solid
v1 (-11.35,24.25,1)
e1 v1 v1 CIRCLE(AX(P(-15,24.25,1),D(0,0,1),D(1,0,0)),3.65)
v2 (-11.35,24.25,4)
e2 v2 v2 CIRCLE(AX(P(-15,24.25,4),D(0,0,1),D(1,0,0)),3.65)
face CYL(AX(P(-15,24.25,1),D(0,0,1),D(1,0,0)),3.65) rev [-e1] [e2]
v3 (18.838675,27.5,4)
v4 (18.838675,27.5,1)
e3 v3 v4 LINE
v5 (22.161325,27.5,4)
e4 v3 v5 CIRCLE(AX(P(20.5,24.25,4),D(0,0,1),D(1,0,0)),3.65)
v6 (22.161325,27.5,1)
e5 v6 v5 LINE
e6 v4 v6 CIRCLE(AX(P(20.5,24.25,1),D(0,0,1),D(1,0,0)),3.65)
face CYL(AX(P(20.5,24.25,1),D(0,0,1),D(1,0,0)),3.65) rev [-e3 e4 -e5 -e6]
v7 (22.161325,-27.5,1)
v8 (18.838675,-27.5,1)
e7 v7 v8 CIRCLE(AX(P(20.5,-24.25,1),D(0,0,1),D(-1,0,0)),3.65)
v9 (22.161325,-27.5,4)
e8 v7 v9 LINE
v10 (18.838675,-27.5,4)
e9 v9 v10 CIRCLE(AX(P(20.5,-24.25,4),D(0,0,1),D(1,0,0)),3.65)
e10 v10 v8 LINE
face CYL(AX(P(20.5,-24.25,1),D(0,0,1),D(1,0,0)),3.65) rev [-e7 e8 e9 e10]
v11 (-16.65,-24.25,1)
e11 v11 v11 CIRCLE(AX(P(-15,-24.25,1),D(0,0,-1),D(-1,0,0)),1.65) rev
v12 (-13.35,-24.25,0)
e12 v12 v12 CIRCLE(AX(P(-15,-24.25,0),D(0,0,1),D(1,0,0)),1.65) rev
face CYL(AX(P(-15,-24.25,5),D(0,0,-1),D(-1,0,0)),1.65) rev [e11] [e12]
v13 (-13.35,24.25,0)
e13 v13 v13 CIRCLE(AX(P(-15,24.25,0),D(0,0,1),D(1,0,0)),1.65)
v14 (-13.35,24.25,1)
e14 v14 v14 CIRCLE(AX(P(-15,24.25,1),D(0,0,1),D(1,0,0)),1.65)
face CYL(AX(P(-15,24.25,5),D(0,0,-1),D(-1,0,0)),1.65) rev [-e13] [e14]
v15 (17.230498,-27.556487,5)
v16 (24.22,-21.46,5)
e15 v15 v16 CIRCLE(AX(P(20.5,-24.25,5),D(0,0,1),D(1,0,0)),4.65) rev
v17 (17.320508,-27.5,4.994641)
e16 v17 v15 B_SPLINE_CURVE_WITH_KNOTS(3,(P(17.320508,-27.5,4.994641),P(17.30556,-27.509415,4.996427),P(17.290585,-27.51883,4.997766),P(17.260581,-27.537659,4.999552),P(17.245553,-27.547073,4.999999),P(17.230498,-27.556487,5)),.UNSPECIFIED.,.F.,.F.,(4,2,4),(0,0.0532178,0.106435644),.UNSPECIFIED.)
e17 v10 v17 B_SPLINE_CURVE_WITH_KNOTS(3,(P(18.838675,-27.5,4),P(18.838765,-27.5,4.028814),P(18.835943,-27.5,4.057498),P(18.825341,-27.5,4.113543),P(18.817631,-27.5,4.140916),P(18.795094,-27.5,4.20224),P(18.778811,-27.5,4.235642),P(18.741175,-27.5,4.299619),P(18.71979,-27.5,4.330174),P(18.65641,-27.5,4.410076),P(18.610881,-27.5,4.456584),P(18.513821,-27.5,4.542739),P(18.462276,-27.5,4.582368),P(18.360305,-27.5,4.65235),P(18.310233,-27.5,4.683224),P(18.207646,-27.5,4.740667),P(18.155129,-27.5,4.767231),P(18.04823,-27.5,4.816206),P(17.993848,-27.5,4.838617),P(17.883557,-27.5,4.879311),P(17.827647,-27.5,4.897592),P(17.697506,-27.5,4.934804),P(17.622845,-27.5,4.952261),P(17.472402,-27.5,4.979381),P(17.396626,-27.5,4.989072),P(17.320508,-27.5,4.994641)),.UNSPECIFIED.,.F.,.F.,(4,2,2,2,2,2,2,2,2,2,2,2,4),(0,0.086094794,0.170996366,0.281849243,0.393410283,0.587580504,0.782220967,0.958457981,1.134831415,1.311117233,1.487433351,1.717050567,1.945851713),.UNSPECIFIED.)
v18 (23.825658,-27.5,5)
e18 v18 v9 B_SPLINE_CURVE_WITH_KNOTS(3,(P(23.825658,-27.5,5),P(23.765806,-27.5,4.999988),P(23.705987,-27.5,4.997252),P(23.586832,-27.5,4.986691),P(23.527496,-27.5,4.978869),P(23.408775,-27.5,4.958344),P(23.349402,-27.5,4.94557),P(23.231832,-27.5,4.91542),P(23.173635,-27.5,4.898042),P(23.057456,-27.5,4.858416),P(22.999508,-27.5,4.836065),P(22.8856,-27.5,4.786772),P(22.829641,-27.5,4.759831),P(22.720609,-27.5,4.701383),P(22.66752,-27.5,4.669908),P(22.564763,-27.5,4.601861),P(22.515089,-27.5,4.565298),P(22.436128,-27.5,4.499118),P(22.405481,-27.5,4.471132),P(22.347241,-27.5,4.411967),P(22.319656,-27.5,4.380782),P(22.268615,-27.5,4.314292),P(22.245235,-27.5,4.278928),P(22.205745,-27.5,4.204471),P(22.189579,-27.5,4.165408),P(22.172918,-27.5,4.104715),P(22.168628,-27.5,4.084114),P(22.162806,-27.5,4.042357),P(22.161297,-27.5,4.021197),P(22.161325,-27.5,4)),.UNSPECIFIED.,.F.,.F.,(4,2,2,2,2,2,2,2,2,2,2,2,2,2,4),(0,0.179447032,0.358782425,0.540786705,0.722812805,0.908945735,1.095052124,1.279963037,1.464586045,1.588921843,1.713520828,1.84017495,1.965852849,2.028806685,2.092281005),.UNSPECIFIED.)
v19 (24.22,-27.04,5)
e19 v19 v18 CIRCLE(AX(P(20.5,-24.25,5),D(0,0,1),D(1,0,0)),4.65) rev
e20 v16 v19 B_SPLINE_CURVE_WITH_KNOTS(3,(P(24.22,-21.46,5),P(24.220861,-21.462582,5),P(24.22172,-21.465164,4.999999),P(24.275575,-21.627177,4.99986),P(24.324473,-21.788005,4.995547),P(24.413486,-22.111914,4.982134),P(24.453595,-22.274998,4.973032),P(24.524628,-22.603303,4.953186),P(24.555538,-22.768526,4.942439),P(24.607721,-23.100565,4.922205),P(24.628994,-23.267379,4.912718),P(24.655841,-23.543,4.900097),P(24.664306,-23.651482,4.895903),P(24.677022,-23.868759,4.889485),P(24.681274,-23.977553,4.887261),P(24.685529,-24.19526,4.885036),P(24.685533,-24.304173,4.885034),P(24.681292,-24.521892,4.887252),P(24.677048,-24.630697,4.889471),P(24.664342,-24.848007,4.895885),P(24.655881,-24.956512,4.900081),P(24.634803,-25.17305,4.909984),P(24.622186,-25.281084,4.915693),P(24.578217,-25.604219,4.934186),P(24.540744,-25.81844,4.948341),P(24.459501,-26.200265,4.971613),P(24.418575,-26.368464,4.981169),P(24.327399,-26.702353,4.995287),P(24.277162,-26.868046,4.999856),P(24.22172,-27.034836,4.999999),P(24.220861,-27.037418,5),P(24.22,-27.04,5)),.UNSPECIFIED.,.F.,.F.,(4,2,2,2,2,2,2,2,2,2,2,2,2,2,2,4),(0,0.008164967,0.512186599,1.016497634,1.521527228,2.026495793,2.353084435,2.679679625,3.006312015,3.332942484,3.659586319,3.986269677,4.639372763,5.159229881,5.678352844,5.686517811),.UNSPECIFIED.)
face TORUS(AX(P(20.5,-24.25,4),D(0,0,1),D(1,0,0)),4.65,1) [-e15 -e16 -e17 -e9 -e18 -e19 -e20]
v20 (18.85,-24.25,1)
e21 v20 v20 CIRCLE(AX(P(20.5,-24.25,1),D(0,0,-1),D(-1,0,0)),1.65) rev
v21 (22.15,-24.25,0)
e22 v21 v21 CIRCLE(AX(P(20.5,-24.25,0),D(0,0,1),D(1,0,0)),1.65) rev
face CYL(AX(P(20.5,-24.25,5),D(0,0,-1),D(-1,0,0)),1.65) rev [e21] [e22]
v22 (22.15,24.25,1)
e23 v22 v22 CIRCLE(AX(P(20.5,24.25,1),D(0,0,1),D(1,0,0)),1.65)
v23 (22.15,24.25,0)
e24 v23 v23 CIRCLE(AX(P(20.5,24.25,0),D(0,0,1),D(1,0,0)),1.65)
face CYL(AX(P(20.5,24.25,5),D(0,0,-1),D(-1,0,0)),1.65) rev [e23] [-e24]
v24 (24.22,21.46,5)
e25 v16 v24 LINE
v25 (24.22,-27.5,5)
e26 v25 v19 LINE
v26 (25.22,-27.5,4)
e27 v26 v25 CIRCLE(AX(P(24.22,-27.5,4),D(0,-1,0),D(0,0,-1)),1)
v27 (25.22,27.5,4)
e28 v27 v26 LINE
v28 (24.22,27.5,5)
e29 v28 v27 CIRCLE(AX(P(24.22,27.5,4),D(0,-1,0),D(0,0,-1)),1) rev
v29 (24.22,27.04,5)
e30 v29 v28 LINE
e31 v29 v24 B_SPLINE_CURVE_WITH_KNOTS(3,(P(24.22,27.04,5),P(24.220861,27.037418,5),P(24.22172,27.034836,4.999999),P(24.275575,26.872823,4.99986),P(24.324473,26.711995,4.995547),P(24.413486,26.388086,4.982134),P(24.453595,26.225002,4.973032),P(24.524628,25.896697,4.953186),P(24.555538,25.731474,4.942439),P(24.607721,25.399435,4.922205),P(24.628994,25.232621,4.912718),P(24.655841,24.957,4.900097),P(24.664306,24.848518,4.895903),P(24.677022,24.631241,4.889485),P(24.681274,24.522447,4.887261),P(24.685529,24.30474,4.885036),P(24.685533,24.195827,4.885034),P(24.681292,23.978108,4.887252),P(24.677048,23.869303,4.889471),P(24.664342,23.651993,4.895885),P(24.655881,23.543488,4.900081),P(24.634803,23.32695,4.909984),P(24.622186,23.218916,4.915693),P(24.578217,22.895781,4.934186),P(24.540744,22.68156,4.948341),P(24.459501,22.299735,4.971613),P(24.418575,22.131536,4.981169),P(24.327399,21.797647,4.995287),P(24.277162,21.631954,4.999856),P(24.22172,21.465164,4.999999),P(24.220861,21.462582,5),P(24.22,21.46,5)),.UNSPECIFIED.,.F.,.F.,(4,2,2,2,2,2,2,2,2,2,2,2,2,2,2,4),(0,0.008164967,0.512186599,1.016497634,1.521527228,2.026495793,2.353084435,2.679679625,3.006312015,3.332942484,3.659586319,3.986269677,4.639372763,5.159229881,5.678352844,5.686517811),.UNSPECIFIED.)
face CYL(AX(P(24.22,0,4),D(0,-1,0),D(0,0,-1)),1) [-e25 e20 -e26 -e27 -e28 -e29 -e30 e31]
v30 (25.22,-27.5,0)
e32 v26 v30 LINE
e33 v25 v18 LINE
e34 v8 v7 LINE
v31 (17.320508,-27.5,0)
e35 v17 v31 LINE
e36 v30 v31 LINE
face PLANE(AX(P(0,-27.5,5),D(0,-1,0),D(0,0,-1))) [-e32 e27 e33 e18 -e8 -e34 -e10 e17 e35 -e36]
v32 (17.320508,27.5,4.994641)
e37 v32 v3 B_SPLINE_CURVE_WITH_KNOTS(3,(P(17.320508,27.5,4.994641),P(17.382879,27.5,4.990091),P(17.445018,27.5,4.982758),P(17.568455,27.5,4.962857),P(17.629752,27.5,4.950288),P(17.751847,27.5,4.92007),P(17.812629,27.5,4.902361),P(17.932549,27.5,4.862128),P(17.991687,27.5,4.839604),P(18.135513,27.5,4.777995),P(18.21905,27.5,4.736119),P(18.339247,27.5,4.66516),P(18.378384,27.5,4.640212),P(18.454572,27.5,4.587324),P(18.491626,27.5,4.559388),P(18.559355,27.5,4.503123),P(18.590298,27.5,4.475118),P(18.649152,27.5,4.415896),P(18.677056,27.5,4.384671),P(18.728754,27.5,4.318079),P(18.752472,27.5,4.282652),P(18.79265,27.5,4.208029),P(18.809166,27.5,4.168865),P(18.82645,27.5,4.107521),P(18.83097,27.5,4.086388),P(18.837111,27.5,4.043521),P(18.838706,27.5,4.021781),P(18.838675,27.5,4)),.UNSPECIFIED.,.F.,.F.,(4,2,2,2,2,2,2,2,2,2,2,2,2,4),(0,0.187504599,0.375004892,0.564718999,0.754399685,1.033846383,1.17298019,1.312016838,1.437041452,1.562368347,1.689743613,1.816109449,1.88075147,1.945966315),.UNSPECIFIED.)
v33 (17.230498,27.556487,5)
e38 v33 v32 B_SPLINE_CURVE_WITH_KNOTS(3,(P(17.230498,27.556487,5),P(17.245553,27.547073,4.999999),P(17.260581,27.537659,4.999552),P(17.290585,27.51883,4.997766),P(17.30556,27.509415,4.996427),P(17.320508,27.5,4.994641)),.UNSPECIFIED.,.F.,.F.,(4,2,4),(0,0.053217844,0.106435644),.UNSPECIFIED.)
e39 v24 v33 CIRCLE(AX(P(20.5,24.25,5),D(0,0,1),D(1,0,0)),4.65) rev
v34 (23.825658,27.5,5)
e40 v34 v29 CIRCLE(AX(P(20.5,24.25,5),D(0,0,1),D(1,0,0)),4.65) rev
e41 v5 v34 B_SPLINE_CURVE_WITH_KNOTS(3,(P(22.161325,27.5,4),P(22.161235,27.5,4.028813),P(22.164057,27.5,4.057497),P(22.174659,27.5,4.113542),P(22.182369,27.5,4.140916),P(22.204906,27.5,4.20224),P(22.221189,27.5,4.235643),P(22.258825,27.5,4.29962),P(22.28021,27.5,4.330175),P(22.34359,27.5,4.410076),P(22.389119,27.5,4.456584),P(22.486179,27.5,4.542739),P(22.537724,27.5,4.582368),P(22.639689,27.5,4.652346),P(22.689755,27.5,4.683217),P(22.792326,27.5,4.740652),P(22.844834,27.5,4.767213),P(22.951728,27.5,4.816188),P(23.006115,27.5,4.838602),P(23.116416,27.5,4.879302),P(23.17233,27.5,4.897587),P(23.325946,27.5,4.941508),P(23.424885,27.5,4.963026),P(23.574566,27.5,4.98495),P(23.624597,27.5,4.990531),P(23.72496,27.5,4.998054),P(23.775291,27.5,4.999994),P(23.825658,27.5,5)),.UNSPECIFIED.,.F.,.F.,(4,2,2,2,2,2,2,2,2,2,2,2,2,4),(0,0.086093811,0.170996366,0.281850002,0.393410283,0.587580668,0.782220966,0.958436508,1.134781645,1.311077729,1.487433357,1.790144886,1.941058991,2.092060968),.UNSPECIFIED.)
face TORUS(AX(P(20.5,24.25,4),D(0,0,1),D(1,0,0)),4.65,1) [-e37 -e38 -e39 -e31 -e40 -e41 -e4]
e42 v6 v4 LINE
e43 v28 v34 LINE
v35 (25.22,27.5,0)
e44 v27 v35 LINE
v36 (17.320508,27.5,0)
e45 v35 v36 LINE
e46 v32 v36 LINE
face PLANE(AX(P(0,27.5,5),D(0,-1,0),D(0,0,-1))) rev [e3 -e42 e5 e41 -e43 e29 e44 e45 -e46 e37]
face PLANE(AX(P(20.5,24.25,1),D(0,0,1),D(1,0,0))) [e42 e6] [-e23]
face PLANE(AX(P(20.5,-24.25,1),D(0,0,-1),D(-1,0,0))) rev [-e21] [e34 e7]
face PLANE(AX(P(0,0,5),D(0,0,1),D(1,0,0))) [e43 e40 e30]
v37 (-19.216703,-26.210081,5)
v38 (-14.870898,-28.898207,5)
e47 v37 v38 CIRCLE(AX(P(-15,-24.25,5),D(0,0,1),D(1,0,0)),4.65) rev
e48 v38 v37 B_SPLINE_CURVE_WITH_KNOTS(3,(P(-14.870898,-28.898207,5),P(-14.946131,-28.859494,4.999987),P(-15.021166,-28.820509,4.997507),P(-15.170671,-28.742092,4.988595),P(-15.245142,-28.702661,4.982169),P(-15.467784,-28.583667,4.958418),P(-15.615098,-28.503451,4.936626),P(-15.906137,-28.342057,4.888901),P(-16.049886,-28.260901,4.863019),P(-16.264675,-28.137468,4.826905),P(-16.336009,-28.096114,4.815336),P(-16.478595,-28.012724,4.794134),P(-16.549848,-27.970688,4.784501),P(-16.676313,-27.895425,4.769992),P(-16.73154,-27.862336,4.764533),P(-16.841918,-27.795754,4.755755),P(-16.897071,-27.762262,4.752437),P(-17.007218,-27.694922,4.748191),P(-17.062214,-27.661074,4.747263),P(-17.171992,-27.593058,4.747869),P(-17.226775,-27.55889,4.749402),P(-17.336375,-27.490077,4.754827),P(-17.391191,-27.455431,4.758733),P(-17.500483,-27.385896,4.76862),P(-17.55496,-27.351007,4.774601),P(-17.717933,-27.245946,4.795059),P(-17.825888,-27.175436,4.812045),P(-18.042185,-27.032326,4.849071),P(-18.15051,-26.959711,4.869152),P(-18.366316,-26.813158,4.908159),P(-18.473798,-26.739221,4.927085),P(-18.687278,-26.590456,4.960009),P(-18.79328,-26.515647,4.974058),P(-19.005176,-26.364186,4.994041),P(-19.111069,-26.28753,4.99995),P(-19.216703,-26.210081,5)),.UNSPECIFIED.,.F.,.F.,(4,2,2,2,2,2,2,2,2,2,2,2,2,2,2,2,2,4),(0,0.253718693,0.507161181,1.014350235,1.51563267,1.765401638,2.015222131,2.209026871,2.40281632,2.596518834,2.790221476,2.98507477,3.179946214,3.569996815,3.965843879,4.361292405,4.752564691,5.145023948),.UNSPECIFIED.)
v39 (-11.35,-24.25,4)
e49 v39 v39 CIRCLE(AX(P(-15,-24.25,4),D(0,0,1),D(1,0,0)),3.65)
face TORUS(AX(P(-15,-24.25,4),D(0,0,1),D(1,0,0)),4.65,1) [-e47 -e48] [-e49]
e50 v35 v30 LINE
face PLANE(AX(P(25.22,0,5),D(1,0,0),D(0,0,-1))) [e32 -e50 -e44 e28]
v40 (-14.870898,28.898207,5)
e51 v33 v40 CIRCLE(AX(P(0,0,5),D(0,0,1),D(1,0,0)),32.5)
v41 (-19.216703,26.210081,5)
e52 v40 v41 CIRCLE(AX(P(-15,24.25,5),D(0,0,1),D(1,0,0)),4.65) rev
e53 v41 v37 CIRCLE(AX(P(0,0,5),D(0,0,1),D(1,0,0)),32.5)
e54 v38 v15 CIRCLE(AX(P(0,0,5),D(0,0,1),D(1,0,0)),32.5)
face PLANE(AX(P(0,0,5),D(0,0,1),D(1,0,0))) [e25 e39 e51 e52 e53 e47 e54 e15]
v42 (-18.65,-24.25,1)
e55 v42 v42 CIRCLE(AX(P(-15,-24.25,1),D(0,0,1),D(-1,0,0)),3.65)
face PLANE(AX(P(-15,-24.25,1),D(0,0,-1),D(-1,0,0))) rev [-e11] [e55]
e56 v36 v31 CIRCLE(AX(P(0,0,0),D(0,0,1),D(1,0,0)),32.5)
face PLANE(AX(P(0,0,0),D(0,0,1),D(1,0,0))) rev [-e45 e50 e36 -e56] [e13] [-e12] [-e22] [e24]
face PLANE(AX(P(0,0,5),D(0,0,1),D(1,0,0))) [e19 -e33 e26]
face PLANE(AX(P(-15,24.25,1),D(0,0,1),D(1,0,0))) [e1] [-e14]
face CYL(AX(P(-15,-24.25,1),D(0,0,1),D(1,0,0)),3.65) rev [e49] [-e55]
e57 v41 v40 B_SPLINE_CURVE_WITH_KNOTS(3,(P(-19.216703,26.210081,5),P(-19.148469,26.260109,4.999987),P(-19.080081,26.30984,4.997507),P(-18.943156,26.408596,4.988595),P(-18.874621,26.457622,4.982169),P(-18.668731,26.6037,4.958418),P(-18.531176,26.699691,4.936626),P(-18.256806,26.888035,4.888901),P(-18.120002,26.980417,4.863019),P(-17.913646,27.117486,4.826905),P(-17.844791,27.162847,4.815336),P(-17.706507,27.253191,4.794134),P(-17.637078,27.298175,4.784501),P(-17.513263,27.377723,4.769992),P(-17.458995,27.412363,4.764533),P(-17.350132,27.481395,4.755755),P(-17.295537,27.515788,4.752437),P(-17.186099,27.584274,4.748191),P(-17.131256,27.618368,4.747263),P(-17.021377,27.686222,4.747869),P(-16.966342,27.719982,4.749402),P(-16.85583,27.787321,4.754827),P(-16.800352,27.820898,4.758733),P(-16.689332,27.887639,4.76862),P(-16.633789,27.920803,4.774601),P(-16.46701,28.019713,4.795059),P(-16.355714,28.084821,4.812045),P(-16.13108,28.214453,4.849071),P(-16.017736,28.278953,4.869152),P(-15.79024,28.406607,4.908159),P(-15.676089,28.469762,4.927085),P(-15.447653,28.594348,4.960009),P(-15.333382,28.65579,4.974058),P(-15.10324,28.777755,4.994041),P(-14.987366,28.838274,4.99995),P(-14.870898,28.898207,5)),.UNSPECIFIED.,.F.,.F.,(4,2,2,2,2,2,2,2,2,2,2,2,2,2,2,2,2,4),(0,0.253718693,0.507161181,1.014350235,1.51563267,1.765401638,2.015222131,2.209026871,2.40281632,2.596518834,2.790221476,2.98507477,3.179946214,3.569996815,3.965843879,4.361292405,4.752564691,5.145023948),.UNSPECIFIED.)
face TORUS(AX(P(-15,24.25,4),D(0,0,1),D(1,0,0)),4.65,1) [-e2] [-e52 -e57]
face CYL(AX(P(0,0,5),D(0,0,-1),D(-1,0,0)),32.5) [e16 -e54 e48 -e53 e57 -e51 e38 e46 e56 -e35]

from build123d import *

# Parameters (mm, degrees)
SKIZZE1_R                       = 1.65
AUFSATZ_LINEAR_AUSTRAGEN1_DEPTH = 5
SKIZZE2_R                       = 3.65
SCHNITT_LINEAR_AUSTRAGEN1_DEPTH = 4
VERRUNDUNG10_R                  = 1


with BuildPart() as part:
    # Skizze1 → Aufsatz-Linear austragen1 (new body)
    with BuildSketch(Plane.XY):
        with BuildLine():
            Line((25.22, 27.5), (17.320508076, 27.5))
            ThreePointArc((17.320508076, 27.5), (-32.5, 0), (17.320508076, -27.5))
            Line((17.320508076, -27.5), (25.22, -27.5))
            Line((25.22, -27.5), (25.22, 27.5))
        make_face()
        with Locations((20.5, -24.25)):
            Circle(SKIZZE1_R, mode=Mode.SUBTRACT)
        with Locations((20.5, 24.25)):
            Circle(SKIZZE1_R, mode=Mode.SUBTRACT)
        with Locations((-15, -24.25)):
            Circle(SKIZZE1_R, mode=Mode.SUBTRACT)
        with Locations((-15, 24.25)):
            Circle(SKIZZE1_R, mode=Mode.SUBTRACT)
    extrude(amount=AUFSATZ_LINEAR_AUSTRAGEN1_DEPTH)

    # Skizze2 → Schnitt-Linear austragen1 (cut)
    with BuildSketch(Plane.XY.offset(5)):
        with Locations((-15, 24.25)):
            Circle(SKIZZE2_R)
        with Locations((20.5, 24.25)):
            Circle(SKIZZE2_R)
        with Locations((20.5, -24.25)):
            Circle(SKIZZE2_R)
        with Locations(Location((-15, -24.25, 0), (0, 0, 180))):
            Circle(SKIZZE2_R)
    extrude(amount=-SCHNITT_LINEAR_AUSTRAGEN1_DEPTH, mode=Mode.SUBTRACT)

    # Verrundung10
    # the kernel refuses this fillet: 1 mm, written as the material it takes off along each edge
    with BuildSketch(Plane(origin=(25.22, -30, 5), x_dir=(-1, 0, 0), z_dir=(0, 1, 0))) as verrundung10_piece_1:
        with BuildLine():
            CenterArc((VERRUNDUNG10_R, -VERRUNDUNG10_R), VERRUNDUNG10_R, 90, 90)
            Line((0, -VERRUNDUNG10_R), (0, 0))
            Line((0, 0), (VERRUNDUNG10_R, 0))
        make_face()
    extrude(amount=60, mode=Mode.SUBTRACT)
    with BuildSketch(Plane(origin=(20.5, 24.25, 5), x_dir=(0.0031415874858533787, 0.9999950652018582, 0), z_dir=(-0.9999950652018582, 0.0031415874858533787, 0))) as verrundung10_piece_2:
        with BuildLine():
            CenterArc((3.65 + VERRUNDUNG10_R, VERRUNDUNG10_R), VERRUNDUNG10_R, 180, 90)
            Line((3.65 + VERRUNDUNG10_R, 0), (3.65, 0))
            Line((3.65, 0), (3.65, VERRUNDUNG10_R))
        make_face()
    revolve(axis=Axis((20.5, 24.25, 5), (0, 0, -1)), revolution_arc=359.64, mode=Mode.SUBTRACT)
    with BuildSketch(Plane(origin=(20.5, -24.25, 5), x_dir=(-0.0031415874859059387, -0.999995065201858, 0), z_dir=(0.999995065201858, -0.0031415874859059387, 0))) as verrundung10_piece_3:
        with BuildLine():
            CenterArc((3.65 + VERRUNDUNG10_R, VERRUNDUNG10_R), VERRUNDUNG10_R, 180, 90)
            Line((3.65 + VERRUNDUNG10_R, 0), (3.65, 0))
            Line((3.65, 0), (3.65, VERRUNDUNG10_R))
        make_face()
    revolve(axis=Axis((20.5, -24.25, 5), (0, 0, -1)), revolution_arc=359.64, mode=Mode.SUBTRACT)
    with BuildSketch(Plane(origin=(-15, -24.25, 5), x_dir=(-1, 0, 0), z_dir=(0, 1, 0))) as verrundung10_piece_4:
        with BuildLine():
            CenterArc((3.65 + VERRUNDUNG10_R, -VERRUNDUNG10_R), VERRUNDUNG10_R, 90, 90)
            Line((3.65, -VERRUNDUNG10_R), (3.65, 0))
            Line((3.65, 0), (3.65 + VERRUNDUNG10_R, 0))
        make_face()
    revolve(axis=Axis((-15, -24.25, 5), (0, 0, 1)), mode=Mode.SUBTRACT)
    with BuildSketch(Plane(origin=(-15, 24.25, 5), x_dir=(1, 0, 0), z_dir=(0, -1, 0))) as verrundung10_piece_5:
        with BuildLine():
            CenterArc((3.65 + VERRUNDUNG10_R, -VERRUNDUNG10_R), VERRUNDUNG10_R, 90, 90)
            Line((3.65, -VERRUNDUNG10_R), (3.65, 0))
            Line((3.65, 0), (3.65 + VERRUNDUNG10_R, 0))
        make_face()
    revolve(axis=Axis((-15, 24.25, 5), (0, 0, 1)), mode=Mode.SUBTRACT)


solid = part.part
